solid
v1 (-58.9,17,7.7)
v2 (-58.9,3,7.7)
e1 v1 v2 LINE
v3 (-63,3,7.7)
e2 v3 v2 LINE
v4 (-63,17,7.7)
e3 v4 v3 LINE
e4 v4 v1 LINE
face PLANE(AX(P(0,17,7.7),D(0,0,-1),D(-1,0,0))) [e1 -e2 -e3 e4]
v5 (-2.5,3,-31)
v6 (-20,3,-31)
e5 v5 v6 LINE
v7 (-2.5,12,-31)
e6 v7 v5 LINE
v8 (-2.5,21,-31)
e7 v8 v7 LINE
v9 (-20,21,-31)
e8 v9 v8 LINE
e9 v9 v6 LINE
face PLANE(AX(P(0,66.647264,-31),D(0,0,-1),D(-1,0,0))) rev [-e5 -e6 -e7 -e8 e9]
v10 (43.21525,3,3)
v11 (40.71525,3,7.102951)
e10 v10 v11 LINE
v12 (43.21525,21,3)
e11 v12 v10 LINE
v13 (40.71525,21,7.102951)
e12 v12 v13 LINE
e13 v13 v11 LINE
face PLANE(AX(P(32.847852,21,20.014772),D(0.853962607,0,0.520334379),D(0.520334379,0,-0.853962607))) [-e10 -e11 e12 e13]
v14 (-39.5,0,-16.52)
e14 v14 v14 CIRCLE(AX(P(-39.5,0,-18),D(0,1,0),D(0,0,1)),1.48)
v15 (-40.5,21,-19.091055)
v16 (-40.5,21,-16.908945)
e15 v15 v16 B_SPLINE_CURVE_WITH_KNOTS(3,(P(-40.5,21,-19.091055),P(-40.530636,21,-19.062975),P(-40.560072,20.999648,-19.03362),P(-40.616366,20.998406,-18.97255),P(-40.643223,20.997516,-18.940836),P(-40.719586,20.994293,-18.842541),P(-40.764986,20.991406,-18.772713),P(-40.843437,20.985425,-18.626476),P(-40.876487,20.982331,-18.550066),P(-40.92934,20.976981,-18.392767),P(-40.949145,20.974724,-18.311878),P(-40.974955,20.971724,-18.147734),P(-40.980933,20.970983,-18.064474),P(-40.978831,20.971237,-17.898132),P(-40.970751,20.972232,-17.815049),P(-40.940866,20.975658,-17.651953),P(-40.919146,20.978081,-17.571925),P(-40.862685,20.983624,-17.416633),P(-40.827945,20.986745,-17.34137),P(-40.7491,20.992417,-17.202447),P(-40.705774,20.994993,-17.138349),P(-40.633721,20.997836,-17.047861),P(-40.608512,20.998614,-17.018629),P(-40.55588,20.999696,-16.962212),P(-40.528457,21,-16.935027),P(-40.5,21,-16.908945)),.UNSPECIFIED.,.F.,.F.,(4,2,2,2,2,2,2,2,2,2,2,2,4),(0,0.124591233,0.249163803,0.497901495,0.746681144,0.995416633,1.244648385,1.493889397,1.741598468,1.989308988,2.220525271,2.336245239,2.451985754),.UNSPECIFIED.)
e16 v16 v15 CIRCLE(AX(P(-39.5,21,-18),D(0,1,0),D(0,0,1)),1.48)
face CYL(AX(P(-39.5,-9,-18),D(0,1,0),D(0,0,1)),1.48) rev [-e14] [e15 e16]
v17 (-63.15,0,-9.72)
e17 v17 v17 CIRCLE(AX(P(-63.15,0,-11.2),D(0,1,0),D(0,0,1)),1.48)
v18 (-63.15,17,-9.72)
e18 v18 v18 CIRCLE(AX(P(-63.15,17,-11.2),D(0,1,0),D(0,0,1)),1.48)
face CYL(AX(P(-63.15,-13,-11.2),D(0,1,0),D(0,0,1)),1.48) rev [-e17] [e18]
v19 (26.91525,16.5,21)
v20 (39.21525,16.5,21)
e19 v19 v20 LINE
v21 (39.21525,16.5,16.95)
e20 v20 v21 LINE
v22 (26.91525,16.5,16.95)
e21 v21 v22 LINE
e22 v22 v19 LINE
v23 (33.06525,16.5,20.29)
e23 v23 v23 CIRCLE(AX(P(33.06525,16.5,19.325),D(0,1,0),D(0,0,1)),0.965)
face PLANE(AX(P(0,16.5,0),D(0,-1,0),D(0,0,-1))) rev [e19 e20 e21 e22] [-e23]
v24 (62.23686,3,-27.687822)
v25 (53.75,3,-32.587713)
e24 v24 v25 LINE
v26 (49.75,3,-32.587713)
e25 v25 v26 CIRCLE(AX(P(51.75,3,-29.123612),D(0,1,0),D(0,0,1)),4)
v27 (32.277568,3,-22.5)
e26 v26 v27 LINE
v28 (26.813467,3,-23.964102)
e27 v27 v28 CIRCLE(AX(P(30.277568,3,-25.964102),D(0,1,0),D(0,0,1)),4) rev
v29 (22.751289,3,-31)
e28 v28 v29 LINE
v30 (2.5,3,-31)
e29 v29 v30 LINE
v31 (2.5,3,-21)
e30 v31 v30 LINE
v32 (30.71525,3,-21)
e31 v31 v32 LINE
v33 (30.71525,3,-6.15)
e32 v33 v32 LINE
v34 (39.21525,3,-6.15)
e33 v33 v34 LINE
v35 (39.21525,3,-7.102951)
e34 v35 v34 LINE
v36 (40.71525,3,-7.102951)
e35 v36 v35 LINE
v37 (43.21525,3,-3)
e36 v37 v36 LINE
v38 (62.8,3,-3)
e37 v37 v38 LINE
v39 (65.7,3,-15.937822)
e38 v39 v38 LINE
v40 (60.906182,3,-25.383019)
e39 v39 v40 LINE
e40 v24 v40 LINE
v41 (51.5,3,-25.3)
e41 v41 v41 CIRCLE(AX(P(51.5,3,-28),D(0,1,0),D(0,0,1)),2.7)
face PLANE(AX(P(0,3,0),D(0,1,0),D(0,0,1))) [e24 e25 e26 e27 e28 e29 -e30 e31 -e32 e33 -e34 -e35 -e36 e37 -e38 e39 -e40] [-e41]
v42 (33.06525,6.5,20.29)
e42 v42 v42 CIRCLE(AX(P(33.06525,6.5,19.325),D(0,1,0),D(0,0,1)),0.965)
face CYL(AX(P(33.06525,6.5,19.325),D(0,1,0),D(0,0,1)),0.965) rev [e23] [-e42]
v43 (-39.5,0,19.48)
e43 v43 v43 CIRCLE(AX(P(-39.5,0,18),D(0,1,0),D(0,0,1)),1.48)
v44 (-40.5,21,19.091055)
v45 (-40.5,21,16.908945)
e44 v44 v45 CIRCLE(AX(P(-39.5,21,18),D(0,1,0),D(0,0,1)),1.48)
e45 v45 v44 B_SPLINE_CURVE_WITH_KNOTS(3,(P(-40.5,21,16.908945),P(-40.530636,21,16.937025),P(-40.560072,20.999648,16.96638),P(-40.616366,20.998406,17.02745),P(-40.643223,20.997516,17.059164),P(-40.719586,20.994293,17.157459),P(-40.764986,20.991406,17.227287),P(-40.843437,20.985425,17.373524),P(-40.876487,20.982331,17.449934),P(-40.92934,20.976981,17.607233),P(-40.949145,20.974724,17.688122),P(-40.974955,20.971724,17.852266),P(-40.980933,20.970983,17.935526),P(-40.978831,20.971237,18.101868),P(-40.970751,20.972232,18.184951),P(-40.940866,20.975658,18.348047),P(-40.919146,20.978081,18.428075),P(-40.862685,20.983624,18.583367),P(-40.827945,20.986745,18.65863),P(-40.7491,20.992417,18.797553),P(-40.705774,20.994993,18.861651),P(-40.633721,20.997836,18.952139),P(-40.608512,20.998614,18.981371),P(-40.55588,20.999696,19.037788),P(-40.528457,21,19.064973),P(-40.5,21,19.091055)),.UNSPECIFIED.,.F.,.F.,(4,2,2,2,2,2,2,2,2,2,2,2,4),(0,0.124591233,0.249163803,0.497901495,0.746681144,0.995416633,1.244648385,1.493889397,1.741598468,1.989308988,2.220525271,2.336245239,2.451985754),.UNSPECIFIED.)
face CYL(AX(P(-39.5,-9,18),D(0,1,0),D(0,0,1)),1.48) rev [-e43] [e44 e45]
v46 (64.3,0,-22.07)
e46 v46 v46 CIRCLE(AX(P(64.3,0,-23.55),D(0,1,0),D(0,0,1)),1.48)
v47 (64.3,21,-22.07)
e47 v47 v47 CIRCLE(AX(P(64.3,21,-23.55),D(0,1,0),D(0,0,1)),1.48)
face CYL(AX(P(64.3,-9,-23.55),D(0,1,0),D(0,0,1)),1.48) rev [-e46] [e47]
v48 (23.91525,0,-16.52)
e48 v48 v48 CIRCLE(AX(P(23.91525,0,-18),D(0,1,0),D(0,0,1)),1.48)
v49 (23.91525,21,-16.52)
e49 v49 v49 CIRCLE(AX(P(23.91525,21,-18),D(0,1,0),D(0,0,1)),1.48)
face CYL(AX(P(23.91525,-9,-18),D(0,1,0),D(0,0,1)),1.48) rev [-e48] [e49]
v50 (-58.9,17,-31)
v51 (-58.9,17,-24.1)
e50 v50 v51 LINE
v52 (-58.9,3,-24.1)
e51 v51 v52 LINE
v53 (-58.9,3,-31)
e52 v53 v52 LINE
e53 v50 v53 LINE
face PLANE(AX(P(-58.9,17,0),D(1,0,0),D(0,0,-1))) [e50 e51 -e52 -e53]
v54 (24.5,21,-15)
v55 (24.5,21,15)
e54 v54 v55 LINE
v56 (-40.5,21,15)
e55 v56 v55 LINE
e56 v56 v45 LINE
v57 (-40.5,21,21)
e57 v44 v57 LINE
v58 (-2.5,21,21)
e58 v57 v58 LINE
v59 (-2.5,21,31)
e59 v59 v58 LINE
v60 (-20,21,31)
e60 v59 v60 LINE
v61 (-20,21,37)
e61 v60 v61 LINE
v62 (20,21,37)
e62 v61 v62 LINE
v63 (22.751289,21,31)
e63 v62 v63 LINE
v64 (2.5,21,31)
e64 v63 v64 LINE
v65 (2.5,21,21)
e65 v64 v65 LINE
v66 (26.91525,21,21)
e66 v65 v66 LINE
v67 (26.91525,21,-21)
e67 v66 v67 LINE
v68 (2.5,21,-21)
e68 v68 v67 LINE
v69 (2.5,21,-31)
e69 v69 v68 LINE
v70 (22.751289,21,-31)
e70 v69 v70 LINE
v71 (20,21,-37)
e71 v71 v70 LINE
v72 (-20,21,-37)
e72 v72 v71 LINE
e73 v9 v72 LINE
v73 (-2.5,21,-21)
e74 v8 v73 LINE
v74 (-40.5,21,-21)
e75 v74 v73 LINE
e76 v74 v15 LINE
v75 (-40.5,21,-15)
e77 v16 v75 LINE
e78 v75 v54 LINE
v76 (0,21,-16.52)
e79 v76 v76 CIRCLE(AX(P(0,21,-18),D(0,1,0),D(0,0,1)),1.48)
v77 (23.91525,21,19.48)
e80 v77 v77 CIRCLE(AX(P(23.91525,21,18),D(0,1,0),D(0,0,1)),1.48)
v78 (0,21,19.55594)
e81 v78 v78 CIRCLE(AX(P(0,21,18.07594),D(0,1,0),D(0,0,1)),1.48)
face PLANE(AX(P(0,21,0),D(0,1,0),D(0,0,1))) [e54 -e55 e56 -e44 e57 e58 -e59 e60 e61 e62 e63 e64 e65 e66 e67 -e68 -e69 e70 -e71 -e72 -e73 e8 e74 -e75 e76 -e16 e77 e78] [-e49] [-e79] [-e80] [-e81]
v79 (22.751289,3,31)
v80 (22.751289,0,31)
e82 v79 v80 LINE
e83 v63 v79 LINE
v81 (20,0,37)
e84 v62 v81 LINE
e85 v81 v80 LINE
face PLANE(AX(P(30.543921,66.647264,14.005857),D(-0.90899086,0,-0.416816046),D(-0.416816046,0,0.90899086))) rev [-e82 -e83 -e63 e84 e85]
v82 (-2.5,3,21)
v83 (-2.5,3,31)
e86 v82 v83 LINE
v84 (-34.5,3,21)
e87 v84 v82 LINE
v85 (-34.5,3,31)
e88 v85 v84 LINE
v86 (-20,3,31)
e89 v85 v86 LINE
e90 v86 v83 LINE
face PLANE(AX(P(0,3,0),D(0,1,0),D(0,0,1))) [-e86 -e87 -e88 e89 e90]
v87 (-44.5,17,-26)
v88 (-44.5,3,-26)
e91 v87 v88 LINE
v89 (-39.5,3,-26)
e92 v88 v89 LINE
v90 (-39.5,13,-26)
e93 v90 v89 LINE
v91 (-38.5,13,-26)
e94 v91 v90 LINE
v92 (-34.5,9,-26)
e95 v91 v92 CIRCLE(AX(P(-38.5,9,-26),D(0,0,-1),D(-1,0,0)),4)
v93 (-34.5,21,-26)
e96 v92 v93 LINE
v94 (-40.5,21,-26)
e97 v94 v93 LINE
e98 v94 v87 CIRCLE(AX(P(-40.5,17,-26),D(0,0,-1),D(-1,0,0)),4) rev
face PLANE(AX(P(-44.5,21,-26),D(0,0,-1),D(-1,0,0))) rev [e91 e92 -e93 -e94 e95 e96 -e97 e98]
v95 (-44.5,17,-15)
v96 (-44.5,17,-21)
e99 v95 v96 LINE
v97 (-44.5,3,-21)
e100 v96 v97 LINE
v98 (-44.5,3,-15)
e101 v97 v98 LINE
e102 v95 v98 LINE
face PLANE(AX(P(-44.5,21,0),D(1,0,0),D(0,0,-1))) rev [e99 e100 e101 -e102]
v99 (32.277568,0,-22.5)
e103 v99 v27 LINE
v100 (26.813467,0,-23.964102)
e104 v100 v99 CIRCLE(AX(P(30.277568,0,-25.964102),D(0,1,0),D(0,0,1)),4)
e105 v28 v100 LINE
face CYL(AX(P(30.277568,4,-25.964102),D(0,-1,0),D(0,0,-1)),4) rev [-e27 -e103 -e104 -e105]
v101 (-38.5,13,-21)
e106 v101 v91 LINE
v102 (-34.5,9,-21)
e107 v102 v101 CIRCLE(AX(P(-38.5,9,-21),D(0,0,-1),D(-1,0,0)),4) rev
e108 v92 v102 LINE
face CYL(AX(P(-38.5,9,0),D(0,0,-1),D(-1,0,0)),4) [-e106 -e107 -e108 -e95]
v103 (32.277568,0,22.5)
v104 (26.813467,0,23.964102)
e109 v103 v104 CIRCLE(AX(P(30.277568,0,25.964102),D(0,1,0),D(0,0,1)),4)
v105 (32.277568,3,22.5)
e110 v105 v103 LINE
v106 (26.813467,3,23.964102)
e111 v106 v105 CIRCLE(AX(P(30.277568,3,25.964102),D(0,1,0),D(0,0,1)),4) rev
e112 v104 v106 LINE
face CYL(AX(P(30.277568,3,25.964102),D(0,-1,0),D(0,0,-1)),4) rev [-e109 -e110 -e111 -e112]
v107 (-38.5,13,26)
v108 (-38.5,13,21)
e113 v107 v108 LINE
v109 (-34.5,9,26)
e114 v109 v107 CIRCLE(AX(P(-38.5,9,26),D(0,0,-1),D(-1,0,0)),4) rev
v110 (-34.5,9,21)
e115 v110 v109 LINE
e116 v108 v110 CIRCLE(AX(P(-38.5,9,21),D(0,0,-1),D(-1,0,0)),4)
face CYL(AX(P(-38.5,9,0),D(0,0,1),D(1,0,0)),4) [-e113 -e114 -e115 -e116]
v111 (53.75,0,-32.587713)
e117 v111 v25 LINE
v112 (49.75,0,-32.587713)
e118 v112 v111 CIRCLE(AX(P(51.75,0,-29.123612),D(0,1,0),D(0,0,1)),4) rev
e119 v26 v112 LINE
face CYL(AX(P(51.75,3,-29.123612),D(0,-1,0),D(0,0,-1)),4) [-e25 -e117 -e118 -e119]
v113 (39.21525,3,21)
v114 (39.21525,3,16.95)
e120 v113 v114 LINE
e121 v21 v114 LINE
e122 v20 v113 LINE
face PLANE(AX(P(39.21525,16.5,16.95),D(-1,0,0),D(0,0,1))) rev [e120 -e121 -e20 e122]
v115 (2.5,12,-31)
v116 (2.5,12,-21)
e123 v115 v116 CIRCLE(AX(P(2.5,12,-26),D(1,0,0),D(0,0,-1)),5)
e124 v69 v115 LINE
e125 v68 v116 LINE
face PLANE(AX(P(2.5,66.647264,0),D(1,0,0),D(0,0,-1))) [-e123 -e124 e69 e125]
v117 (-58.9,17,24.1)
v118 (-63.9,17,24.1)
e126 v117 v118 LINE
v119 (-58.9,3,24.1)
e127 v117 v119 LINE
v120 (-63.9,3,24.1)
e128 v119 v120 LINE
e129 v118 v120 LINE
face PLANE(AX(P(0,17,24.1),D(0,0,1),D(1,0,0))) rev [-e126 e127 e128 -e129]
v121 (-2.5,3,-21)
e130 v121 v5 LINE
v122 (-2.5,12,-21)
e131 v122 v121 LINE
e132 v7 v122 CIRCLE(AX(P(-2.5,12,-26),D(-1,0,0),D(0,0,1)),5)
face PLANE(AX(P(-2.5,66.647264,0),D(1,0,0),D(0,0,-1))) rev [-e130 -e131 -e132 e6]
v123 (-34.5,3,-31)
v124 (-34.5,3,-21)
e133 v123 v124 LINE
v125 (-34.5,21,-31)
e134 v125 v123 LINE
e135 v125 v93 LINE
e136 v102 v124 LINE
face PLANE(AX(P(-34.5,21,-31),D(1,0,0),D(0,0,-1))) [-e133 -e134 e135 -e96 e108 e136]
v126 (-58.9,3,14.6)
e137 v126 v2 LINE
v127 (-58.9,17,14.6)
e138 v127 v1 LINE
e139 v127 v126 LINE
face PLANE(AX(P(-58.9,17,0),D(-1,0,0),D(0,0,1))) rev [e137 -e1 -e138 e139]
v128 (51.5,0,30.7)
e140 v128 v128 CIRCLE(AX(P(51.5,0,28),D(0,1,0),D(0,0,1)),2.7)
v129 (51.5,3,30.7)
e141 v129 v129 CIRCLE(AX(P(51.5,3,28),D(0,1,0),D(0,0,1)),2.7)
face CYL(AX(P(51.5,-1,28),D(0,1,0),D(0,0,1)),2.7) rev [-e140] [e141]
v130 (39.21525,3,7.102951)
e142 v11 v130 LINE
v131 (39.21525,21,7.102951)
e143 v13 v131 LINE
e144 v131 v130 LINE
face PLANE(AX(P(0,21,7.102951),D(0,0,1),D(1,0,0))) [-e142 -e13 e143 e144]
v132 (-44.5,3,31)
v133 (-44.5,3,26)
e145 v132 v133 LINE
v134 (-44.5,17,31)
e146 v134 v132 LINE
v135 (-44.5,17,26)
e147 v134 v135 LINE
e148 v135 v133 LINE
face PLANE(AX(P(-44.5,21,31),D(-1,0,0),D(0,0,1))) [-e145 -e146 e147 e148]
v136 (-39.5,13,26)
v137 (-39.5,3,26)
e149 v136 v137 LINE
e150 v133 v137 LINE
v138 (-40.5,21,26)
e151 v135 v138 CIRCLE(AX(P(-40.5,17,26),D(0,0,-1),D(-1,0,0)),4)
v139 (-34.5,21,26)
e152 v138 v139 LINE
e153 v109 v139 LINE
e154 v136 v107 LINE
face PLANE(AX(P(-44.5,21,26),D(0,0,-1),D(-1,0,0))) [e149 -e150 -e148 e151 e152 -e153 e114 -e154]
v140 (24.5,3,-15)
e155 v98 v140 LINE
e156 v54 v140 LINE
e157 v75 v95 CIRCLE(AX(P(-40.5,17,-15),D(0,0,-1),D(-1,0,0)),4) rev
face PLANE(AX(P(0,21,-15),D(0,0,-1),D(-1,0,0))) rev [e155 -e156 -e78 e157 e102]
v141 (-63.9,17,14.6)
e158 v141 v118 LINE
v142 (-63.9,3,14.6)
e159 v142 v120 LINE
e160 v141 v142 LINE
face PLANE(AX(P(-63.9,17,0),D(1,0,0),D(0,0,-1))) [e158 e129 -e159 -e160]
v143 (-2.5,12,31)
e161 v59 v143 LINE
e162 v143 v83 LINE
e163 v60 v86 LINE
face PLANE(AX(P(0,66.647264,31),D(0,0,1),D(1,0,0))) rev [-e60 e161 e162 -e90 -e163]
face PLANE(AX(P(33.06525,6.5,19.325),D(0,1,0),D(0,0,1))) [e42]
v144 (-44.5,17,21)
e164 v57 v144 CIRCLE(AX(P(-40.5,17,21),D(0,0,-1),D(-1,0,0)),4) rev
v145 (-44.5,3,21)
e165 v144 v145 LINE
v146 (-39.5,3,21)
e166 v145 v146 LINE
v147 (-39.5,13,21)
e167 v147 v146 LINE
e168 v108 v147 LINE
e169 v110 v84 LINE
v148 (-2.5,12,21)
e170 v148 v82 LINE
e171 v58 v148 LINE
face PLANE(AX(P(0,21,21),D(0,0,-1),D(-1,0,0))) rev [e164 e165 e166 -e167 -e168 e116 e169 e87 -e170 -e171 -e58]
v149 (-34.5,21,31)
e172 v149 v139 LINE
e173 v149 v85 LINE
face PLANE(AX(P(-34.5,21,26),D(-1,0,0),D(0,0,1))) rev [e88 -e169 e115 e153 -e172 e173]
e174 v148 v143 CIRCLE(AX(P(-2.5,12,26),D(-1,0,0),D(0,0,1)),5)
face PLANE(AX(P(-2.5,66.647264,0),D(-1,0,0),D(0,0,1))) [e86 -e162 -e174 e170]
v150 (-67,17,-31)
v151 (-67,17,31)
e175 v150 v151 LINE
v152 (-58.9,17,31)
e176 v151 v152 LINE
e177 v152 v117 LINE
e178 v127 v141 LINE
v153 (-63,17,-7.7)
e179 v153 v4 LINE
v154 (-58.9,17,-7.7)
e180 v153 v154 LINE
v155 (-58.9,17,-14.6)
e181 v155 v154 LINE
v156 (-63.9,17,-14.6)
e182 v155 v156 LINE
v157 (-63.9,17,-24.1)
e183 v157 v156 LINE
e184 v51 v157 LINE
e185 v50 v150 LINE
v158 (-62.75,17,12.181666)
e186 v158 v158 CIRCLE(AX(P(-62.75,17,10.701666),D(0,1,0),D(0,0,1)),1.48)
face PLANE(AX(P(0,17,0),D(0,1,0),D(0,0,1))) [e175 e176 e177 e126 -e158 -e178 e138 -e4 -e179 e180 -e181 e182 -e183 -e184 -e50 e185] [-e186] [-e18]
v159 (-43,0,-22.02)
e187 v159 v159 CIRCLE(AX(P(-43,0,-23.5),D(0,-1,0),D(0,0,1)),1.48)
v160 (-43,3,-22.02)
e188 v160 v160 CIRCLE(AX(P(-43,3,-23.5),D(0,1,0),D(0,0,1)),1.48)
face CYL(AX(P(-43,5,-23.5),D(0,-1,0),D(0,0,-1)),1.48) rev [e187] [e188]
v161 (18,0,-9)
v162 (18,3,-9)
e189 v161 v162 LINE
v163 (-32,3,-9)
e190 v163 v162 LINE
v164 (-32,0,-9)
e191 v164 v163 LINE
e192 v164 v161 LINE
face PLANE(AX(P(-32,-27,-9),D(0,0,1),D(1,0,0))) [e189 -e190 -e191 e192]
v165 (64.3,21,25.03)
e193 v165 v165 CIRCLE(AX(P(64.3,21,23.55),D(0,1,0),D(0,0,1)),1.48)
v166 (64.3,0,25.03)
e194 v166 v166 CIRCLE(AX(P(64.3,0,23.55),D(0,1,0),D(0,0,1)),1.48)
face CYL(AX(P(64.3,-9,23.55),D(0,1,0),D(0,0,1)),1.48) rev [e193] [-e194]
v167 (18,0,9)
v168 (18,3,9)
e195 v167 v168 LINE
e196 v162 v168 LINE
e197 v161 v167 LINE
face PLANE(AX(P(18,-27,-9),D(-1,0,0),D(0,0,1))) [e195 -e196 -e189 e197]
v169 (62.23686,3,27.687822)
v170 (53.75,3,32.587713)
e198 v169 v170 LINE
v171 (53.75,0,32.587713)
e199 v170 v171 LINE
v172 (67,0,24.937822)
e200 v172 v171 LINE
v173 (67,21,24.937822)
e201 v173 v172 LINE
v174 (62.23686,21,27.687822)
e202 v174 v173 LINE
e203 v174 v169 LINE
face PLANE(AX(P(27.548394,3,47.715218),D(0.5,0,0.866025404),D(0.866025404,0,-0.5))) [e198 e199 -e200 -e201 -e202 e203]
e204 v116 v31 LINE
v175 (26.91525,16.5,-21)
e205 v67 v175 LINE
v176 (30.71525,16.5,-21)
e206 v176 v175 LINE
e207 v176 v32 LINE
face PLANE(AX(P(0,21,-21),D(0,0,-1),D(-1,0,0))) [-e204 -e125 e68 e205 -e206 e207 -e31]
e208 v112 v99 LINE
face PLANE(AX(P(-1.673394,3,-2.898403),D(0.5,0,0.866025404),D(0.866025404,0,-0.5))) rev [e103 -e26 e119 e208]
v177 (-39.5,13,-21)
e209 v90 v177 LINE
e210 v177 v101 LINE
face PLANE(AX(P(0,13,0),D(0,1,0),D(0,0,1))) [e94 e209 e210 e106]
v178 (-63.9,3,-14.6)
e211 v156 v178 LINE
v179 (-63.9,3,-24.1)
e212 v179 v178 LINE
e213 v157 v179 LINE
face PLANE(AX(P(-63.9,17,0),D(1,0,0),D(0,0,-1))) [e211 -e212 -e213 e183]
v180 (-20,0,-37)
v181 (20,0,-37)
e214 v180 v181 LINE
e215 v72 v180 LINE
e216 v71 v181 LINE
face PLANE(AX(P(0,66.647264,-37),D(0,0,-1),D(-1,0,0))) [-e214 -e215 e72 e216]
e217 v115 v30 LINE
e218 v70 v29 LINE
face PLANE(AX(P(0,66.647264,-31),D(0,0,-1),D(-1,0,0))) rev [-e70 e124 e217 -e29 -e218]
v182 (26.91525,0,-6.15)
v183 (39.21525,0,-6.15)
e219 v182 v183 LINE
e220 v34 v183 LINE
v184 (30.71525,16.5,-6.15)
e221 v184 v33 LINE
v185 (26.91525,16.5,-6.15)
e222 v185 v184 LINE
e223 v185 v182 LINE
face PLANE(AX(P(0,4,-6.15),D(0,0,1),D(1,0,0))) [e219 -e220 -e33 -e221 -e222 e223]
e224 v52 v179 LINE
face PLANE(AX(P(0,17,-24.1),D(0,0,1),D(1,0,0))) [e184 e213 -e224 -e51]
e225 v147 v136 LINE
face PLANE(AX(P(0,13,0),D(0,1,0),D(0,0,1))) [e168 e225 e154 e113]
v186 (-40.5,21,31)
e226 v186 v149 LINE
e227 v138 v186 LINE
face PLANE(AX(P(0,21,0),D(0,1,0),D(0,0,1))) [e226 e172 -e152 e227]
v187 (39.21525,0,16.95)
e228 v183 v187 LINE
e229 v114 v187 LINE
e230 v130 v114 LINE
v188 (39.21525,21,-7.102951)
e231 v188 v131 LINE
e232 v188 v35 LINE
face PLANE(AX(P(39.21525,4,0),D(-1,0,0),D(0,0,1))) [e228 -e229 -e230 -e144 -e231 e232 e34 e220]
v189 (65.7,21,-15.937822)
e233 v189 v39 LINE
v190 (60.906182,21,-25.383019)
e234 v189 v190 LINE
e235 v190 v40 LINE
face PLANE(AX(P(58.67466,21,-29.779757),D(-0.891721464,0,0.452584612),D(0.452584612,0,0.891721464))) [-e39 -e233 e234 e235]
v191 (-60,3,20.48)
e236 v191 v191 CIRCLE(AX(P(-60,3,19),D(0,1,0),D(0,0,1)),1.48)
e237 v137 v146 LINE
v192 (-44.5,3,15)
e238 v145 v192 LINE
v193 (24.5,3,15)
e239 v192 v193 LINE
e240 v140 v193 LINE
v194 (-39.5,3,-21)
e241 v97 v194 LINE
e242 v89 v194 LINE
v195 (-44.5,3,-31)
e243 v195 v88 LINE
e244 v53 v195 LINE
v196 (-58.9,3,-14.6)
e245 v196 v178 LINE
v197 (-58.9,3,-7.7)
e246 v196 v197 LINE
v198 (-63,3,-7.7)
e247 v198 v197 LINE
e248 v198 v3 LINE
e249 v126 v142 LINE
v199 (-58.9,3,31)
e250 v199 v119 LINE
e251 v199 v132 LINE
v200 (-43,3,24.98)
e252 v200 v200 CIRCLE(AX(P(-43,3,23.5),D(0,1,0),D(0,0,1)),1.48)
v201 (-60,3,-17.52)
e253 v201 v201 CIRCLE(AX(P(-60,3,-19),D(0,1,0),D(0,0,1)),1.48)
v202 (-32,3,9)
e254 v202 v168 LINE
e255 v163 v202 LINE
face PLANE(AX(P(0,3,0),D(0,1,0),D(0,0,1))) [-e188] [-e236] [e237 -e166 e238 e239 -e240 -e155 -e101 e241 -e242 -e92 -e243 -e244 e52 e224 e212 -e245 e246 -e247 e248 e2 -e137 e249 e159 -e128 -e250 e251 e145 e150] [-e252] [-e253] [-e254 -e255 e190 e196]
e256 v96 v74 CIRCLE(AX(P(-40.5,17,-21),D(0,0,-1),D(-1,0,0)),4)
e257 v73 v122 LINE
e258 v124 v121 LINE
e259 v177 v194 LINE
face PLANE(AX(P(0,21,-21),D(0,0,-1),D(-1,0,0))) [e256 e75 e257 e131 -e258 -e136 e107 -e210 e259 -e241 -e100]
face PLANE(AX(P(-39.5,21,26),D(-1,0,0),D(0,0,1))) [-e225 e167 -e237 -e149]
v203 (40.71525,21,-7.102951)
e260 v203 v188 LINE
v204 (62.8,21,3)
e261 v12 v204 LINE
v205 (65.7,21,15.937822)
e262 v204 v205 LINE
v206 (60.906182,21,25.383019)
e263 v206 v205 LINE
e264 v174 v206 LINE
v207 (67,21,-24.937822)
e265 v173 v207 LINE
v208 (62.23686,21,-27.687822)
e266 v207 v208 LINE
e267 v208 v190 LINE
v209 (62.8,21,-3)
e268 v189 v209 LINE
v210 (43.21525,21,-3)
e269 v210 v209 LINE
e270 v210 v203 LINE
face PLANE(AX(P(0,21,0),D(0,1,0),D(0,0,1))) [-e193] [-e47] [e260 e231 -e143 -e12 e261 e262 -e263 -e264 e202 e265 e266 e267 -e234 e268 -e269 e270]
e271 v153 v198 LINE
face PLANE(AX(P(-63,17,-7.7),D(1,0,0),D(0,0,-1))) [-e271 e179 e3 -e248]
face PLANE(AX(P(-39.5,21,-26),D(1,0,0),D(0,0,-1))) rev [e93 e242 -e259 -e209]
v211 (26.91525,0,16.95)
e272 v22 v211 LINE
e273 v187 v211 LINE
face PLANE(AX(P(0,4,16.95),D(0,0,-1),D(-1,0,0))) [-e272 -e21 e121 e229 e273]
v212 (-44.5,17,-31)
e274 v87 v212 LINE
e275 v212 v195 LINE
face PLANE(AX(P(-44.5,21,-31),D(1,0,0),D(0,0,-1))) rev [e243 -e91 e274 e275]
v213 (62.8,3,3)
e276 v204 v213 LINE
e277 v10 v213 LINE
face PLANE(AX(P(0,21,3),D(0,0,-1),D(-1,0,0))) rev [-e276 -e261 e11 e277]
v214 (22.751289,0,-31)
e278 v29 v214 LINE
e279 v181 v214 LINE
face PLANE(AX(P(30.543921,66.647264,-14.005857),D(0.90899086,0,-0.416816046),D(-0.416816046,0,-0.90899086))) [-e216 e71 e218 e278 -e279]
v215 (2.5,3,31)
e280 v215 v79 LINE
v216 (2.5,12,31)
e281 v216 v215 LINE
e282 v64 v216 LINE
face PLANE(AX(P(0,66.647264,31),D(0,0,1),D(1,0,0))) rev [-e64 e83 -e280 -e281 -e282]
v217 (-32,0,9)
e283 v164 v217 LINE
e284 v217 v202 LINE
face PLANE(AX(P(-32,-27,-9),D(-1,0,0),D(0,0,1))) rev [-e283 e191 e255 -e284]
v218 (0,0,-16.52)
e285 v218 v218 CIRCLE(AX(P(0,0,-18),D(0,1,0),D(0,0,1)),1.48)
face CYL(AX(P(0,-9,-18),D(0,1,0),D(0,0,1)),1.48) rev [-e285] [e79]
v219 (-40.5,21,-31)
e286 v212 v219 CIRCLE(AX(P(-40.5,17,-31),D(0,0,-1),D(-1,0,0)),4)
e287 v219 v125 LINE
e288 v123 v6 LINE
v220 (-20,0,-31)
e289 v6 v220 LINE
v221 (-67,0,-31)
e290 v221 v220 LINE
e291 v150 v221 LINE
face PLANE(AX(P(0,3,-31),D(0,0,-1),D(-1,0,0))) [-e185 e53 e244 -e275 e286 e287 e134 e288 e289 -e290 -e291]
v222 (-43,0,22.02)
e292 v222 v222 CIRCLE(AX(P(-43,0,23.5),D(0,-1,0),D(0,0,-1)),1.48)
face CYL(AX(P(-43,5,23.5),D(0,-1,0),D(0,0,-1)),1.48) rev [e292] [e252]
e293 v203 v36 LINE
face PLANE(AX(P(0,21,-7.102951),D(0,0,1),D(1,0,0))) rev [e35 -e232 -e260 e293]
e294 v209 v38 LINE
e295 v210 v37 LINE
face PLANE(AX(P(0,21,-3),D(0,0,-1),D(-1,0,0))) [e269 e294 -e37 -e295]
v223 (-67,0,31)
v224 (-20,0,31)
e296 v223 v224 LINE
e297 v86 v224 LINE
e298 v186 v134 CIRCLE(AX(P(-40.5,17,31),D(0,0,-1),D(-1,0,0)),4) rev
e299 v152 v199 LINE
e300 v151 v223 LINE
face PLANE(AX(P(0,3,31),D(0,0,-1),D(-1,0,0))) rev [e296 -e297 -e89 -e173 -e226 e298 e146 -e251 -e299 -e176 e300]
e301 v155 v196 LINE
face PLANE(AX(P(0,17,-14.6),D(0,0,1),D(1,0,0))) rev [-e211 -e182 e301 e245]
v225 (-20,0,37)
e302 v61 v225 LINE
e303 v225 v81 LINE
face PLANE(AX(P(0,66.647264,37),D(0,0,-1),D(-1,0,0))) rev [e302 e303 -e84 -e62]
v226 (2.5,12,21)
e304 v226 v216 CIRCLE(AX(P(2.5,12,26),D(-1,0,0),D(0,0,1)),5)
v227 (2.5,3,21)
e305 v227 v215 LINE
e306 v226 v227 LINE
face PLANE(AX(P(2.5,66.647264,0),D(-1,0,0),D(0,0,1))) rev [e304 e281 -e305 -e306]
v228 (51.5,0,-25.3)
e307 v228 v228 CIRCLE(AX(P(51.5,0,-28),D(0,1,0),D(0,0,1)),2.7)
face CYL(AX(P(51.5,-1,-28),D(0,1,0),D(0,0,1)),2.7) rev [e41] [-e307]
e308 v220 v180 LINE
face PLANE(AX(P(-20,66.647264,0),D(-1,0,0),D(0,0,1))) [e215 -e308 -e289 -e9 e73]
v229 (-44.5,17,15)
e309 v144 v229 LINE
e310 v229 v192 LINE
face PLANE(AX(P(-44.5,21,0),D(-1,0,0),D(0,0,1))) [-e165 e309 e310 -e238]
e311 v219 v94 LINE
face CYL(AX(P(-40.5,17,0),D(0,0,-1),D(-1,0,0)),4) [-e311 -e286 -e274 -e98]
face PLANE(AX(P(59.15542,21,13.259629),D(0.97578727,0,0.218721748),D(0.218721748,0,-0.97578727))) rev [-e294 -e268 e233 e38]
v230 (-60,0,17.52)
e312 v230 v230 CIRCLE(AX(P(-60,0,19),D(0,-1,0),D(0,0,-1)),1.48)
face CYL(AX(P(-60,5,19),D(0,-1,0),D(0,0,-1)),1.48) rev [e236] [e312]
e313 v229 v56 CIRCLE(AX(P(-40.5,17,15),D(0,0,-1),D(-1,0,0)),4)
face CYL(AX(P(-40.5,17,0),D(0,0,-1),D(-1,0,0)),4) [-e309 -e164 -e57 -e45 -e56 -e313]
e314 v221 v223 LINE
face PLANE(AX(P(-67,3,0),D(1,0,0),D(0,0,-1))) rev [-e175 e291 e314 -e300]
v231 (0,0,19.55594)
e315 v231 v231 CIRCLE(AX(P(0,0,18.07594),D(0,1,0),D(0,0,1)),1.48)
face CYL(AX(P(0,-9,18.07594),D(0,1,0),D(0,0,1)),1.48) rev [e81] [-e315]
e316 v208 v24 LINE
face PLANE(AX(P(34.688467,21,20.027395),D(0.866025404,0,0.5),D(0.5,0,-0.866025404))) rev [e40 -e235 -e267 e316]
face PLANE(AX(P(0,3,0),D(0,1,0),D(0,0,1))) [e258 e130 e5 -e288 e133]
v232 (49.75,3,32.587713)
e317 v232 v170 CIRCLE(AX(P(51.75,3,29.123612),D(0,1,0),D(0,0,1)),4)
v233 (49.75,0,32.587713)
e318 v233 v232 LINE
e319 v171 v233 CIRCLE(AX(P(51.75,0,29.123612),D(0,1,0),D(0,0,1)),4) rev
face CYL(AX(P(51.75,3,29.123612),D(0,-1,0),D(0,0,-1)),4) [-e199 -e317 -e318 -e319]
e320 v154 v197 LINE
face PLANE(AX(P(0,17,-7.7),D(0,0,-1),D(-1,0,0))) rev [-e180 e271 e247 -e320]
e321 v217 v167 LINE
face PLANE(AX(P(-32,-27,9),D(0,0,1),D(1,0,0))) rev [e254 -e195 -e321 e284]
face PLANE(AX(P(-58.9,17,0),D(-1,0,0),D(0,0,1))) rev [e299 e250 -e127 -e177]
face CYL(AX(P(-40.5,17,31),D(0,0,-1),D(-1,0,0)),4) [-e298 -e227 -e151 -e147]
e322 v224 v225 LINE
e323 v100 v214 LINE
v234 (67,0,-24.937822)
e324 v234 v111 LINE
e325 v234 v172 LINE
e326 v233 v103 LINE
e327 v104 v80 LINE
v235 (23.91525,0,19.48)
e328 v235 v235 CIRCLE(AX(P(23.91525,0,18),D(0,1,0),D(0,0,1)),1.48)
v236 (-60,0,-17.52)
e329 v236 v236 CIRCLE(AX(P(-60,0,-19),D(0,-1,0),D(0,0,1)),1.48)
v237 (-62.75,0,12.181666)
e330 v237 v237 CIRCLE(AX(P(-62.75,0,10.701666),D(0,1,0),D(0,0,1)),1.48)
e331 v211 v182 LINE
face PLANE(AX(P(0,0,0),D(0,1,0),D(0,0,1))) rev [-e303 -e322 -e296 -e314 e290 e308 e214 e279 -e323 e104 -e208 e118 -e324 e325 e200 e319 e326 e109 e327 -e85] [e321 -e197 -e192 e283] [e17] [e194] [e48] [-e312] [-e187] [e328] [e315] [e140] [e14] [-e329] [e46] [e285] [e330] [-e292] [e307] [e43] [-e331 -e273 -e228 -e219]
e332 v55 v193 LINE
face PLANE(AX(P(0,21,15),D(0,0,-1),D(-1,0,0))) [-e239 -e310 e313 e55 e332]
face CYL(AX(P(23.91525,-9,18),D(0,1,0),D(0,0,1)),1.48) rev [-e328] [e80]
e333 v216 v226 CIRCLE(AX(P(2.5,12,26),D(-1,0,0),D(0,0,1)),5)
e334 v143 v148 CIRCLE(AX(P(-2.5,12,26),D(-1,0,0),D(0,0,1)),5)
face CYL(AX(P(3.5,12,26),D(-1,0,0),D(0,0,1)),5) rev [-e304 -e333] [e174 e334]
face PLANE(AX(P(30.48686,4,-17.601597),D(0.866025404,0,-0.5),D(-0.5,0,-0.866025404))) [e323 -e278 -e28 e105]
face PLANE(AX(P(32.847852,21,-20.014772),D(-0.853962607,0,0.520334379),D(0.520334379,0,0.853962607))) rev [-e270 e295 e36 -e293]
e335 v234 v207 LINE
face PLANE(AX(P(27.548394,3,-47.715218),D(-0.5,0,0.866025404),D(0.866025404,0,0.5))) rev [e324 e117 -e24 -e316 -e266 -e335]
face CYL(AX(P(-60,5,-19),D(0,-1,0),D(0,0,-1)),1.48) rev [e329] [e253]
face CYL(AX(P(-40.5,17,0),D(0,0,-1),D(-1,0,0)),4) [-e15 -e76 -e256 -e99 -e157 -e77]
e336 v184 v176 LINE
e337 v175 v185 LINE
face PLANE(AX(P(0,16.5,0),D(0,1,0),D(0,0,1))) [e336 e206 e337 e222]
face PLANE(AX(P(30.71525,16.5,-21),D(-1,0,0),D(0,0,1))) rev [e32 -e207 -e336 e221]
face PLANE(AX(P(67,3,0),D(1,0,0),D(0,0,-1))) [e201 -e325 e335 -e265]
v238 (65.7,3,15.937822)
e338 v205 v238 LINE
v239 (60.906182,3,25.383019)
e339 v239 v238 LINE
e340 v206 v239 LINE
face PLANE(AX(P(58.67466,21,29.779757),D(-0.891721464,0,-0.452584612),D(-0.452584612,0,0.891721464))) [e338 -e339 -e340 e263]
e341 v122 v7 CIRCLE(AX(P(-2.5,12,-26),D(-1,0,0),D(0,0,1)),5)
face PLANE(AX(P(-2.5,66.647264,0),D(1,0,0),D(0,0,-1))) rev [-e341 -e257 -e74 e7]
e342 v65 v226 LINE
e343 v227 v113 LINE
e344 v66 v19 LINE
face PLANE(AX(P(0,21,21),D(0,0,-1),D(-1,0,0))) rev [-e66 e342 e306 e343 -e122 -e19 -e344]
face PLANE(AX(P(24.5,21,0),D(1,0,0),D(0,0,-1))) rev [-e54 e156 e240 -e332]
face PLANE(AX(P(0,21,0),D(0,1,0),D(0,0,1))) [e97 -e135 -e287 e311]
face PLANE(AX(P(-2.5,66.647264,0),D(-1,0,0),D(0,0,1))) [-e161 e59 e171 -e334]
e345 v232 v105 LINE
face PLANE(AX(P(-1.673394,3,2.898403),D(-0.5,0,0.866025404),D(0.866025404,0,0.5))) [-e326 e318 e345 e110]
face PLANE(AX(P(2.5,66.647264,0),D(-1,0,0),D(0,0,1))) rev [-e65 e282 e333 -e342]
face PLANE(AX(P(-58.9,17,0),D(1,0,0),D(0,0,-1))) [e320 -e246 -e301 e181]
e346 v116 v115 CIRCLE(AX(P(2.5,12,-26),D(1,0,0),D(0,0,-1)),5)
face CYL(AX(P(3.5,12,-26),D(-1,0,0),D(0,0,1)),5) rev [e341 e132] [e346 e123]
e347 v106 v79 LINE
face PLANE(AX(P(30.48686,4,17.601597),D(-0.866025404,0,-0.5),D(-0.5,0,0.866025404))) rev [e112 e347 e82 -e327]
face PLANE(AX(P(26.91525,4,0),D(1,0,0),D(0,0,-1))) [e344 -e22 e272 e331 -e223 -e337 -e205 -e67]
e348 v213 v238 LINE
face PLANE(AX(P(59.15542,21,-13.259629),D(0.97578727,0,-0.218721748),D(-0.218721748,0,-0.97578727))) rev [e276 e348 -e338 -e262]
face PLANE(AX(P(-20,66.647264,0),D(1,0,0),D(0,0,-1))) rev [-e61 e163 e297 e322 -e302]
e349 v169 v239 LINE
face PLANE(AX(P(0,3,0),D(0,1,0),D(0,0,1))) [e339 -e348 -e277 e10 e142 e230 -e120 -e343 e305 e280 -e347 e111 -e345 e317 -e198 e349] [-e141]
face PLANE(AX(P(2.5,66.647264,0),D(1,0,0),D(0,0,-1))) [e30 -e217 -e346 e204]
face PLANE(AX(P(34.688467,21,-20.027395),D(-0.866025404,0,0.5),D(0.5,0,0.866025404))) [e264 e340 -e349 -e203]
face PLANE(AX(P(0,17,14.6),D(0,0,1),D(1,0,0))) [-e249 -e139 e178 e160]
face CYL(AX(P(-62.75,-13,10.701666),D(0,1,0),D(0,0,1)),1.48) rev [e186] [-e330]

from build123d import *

# Parameters (mm, degrees)
SKETCH_1_W               = 134
SKETCH_1_H               = 62
EXTRUDE_1_DEPTH          = 3
SKETCH_2_R               = 2.7
CUT_EXTRUDE_1_DEPTH      = 4
EXTRUDE_3_DEPTH          = 3
CUT_EXTRUDE_4_DEPTH      = 4
CUT_EXTRUDE_4_DEPTH_BACK = 3
SKETCH_1_6_W             = 12.3
SKETCH_1_6_H             = 23.1
SKETCH_3_W               = 4
SKETCH_3_H               = 15.4
EXTRUDE_4_DEPTH          = 14
SKETCH_4_W               = 5
SKETCH_4_H               = 5
EXTRUDE_5_DEPTH          = 18
FILLET_1_R               = 4
EXTRUDE_6_DEPTH          = 18
SKETCH_6_W               = 12.3
SKETCH_6_H               = 4.05
SKETCH_6_W_2             = 3.8
SKETCH_6_H_2             = 14.85
EXTRUDE_7_DEPTH          = 13.5
SKETCH_7_R               = 1.48
CUT_EXTRUDE_5_DEPTH      = 5
EXTRUDE_9_DEPTH          = 18
EXTRUDE_10_DEPTH         = 18
EXTRUDE_START            = -21
SKETCH_11_W              = 5
SKETCH_11_H              = 10
EXTRUDE_11_DEPTH         = 21
SKETCH_12_R              = 5
CUT_EXTRUDE_6_DEPTH      = 6
SKETCH_13_R              = 5
CUT_EXTRUDE_7_DEPTH      = 6
SKETCH_14_R              = 0.965
CUT_EXTRUDE_8_DEPTH      = 10
SKETCH_17_R              = 1.48
CUT_EXTRUDE_10_DEPTH     = 30
SKETCH_18_R              = 1.48
CUT_EXTRUDE_11_DEPTH     = 30
SKETCH_19_R              = 1.48
CUT_EXTRUDE_12_DEPTH     = 30
SKETCH_20_W              = 5
SKETCH_20_H              = 5
CUT_EXTRUDE_13_DEPTH     = 8
SKETCH_21_R              = 1.48
CUT_EXTRUDE_14_DEPTH     = 30
SKETCH_22_R              = 1.48
CUT_EXTRUDE_15_DEPTH     = 30
SKETCH_23_R              = 1.48
CUT_EXTRUDE_16_DEPTH     = 30
SKETCH_24_W              = 50
SKETCH_24_H              = 18
CUT_EXTRUDE_17_DEPTH     = 30
FILLET_2_R               = 4
FILLET_3_R               = 4


with BuildPart() as part:
    # 草图1 → 凸台-拉伸1 (new body)
    with BuildSketch(Plane(origin=(0, 0, 0), x_dir=(1, 0, 0), z_dir=(0, 1, 0))):
        Rectangle(SKETCH_1_W, SKETCH_1_H)
    extrude(amount=EXTRUDE_1_DEPTH)

    # 草图2 → 切除-拉伸1 (cut)
    with BuildSketch(Plane(origin=(0, 3, 0), x_dir=(1, 0, 0), z_dir=(0, 1, 0))):
        with Locations(Location((51.5, 28, 0), (0, 0, 270))):
            Circle(SKETCH_2_R)
        with Locations(Location((51.5, -28, 0), (0, 0, 270))):
            Circle(SKETCH_2_R)
    extrude(amount=-CUT_EXTRUDE_1_DEPTH, mode=Mode.SUBTRACT)

    # 草图1<4> → 凸台-拉伸3 (add)
    with BuildSketch(Plane(origin=(0, 0, 0), x_dir=(1, 0, 0), z_dir=(0, 1, 0))):
        Polygon((51.75, 33.742413779), (47, 31), (56.5, 31), align=None)
        Polygon((56.5, -31), (47, -31), (51.75, -33.742413779), align=None)
    extrude(amount=EXTRUDE_3_DEPTH)

    # 草图1<6> → 切除-拉伸4 (cut, two sides: drawn at the far end of the back side and taken through both)
    with BuildSketch(Plane(origin=(0, 0, 0), x_dir=(1, 0, 0), z_dir=(0, 1, 0)).offset(-CUT_EXTRUDE_4_DEPTH_BACK)):
        with Locations((33.065250205, -5.4)):
            Rectangle(SKETCH_1_6_W, SKETCH_1_6_H)
        Polygon((47, 31), (22.751288694, 31), (28.813466521, 20.5), align=None)
        Polygon((67, 31), (56.5, 31), (67, 24.937822174), align=None)
        Polygon((28.813466521, -20.5), (22.751288694, -31), (47, -31), align=None)
        Polygon((67, -24.937822174), (56.5, -31), (67, -31), align=None)
    extrude(amount=CUT_EXTRUDE_4_DEPTH + CUT_EXTRUDE_4_DEPTH_BACK, mode=Mode.SUBTRACT)

    # 草图3 → 凸台-拉伸4 (add)
    with BuildSketch(Plane(origin=(0, 3, 0), x_dir=(1, 0, 0), z_dir=(0, 1, 0))):
        Polygon((-58.9, 31), (-67, 31), (-67, 7.7), (-63, 7.7), (-58.9, 7.7), (-58.9, 14.6), (-63.9, 14.6), (-63.9, 24.1), (-58.9, 24.1), align=None)
        Polygon((-63, -7.7), (-67, -7.7), (-67, -31), (-58.9, -31), (-58.9, -24.1), (-63.9, -24.1), (-63.9, -14.6), (-58.9, -14.6), (-58.9, -7.7), align=None)
        with Locations((-65, 0)):
            Rectangle(SKETCH_3_W, SKETCH_3_H)
    extrude(amount=EXTRUDE_4_DEPTH)

    # 草图4 → 凸台-拉伸5 (add)
    with BuildSketch(Plane(origin=(0, 3, 0), x_dir=(1, 0, 0), z_dir=(0, 1, 0))):
        Polygon((24.5, 15), (24.5, 0), (26.915250205, 0), (26.915250205, 21), (24.5, 21), align=None)
        Polygon((26.915250205, 0), (24.5, 0), (24.5, -15), (24.5, -21), (26.915250205, -21), align=None)
        Polygon((-44.5, 15), (24.5, 15), (24.5, 21), (-34.5, 21), (-39.5, 21), (-44.5, 21), align=None)
        Polygon((24.5, -21), (24.5, -15), (-44.5, -15), (-44.5, -21), (-39.5, -21), (-34.5, -21), align=None)
        with Locations((-37, 23.5)):
            Rectangle(SKETCH_4_W, SKETCH_4_H)
        with Locations((-37, -23.5)):
            Rectangle(SKETCH_4_W, SKETCH_4_H)
        Polygon((-39.5, 26), (-34.5, 26), (-34.5, 31), (-44.5, 31), (-44.5, 26), align=None)
        Polygon((-34.5, -31), (-34.5, -26), (-39.5, -26), (-44.5, -26), (-44.5, -31), align=None)
    extrude(amount=EXTRUDE_5_DEPTH)

    # 圆角1
    fillet_1_edges = [part.edges().sort_by_distance(p)[0] for p in [
        (51.75, 1.5, 33.742413779),
        (28.813466521, 1.5, 20.5),
        (28.813466521, 1.5, -20.5),
        (51.75, 1.5, -33.742413779),
    ]]
    fillet(fillet_1_edges, radius=FILLET_1_R)

    # 草图5 → 凸台-拉伸6 (add)
    with BuildSketch(Plane(origin=(0, 3, 0), x_dir=(1, 0, 0), z_dir=(0, 1, 0))):
        Polygon((43.215250205, 3), (39.215250205, 3), (39.215250205, -3), (43.215250205, -3), (67, -3), (67, 3), align=None)
        Polygon((39.215250205, 6.15), (39.215250205, 3), (43.215250205, 3), (40.715250205, 7.102951113), (39.215250205, 7.102951113), align=None)
        Polygon((43.215250205, -3), (39.215250205, -3), (39.215250205, -7.102951113), (40.715250205, -7.102951113), align=None)
    extrude(amount=EXTRUDE_6_DEPTH)

    # 草图6 → 凸台-拉伸7 (add)
    with BuildSketch(Plane(origin=(0, 3, 0), x_dir=(1, 0, 0), z_dir=(0, 1, 0))):
        with Locations((33.065250205, -18.975)):
            Rectangle(SKETCH_6_W, SKETCH_6_H)
        with Locations((28.815250205, 13.575)):
            Rectangle(SKETCH_6_W_2, SKETCH_6_H_2)
    extrude(amount=EXTRUDE_7_DEPTH)

    # 草图7 → 切除-拉伸5 (cut)
    with BuildSketch(Plane.XZ):
        with Locations(Location((-60, 19, 0), (0, 0, 270))):
            Circle(SKETCH_7_R)
        with Locations(Location((-43, 23.5, 0), (0, 0, 270))):
            Circle(SKETCH_7_R)
        with Locations(Location((-43, -23.5, 0), (0, 0, 90))):
            Circle(SKETCH_7_R)
        with Locations(Location((-60, -19, 0), (0, 0, 90))):
            Circle(SKETCH_7_R)
    extrude(amount=-CUT_EXTRUDE_5_DEPTH, mode=Mode.SUBTRACT)

    # 草图9 → 凸台-拉伸9 (add)
    with BuildSketch(Plane(origin=(0, 3, 0), x_dir=(1, 0, 0), z_dir=(0, 1, 0))):
        Polygon((67, 3), (67, 24.937822174), (62.236860279, 27.687822174), (60.906181585, 25.383019067), (65.7, 15.937822174), (62.8, 3), align=None)
    extrude(amount=EXTRUDE_9_DEPTH)

    # 草图10 → 凸台-拉伸10 (add)
    with BuildSketch(Plane(origin=(0, 3, 0), x_dir=(1, 0, 0), z_dir=(0, 1, 0))):
        Polygon((67, -3), (62.8, -3), (65.7, -15.937822174), (60.906181585, -25.383019067), (62.236860279, -27.687822174), (67, -24.937822174), align=None)
    extrude(amount=EXTRUDE_10_DEPTH)

    # 草图11 → 凸台-拉伸11 (add)
    with BuildSketch(Plane.XZ.offset(EXTRUDE_START)):
        Polygon((-2.5, -31), (-20, -31), (-20, -37), (20, -37), (20, -31), (2.5, -31), align=None)
        with Locations((0, -26)):
            Rectangle(SKETCH_11_W, SKETCH_11_H)
        Polygon((20, -31), (20, -37), (22.751288694, -31), align=None)
        Polygon((2.5, 31), (20, 31), (20, 37), (-20, 37), (-20, 31), (-2.5, 31), align=None)
        with Locations((0, 26)):
            Rectangle(SKETCH_11_W, SKETCH_11_H)
        Polygon((20, 31), (22.751288694, 31), (20, 37), align=None)
    extrude(amount=EXTRUDE_11_DEPTH)

    # 草图12 → 切除-拉伸6 (cut)
    with BuildSketch(Plane.ZY.offset(2.5)):
        with Locations((26, 12)):
            Circle(SKETCH_12_R)
    extrude(amount=-CUT_EXTRUDE_6_DEPTH, mode=Mode.SUBTRACT)

    # 草图13 → 切除-拉伸7 (cut)
    with BuildSketch(Plane.ZY.offset(2.5)):
        with Locations((-26, 12)):
            Circle(SKETCH_13_R)
    extrude(amount=-CUT_EXTRUDE_7_DEPTH, mode=Mode.SUBTRACT)

    # 草图14 → 切除-拉伸8 (cut)
    with BuildSketch(Plane(origin=(0, 16.5, 0), x_dir=(1, 0, 0), z_dir=(0, 1, 0))):
        with Locations(Location((33.065250205, -19.325, 0), (0, 0, 270))):
            Circle(SKETCH_14_R)
    extrude(amount=-CUT_EXTRUDE_8_DEPTH, mode=Mode.SUBTRACT)

    # 草图17 → 切除-拉伸10 (cut)
    with BuildSketch(Plane(origin=(0, 21, 0), x_dir=(1, 0, 0), z_dir=(0, 1, 0))):
        with Locations(Location((64.3, 23.55, 0), (0, 0, 270))):
            Circle(SKETCH_17_R)
        with Locations(Location((64.3, -23.55, 0), (0, 0, 270))):
            Circle(SKETCH_17_R)
    extrude(amount=-CUT_EXTRUDE_10_DEPTH, mode=Mode.SUBTRACT)

    # 草图18 → 切除-拉伸11 (cut)
    with BuildSketch(Plane(origin=(0, 21, 0), x_dir=(1, 0, 0), z_dir=(0, 1, 0))):
        with Locations(Location((23.915250205, 18, 0), (0, 0, 270))):
            Circle(SKETCH_18_R)
        with Locations(Location((23.915250205, -18, 0), (0, 0, 270))):
            Circle(SKETCH_18_R)
    extrude(amount=-CUT_EXTRUDE_11_DEPTH, mode=Mode.SUBTRACT)

    # 草图19 → 切除-拉伸12 (cut)
    with BuildSketch(Plane(origin=(0, 21, 0), x_dir=(1, 0, 0), z_dir=(0, 1, 0))):
        with Locations(Location((0, 18, 0), (0, 0, 270))):
            Circle(SKETCH_19_R)
        with Locations(Location((0, -18.075939793, 0), (0, 0, 270))):
            Circle(SKETCH_19_R)
    extrude(amount=-CUT_EXTRUDE_12_DEPTH, mode=Mode.SUBTRACT)

    # 草图20 → 切除-拉伸13 (cut)
    with BuildSketch(Plane(origin=(0, 21, 0), x_dir=(1, 0, 0), z_dir=(0, 1, 0))):
        with Locations((-37, 23.5)):
            Rectangle(SKETCH_20_W, SKETCH_20_H)
        with Locations((-37, -23.5)):
            Rectangle(SKETCH_20_W, SKETCH_20_H)
    extrude(amount=-CUT_EXTRUDE_13_DEPTH, mode=Mode.SUBTRACT)

    # 草图21 → 切除-拉伸14 (cut)
    with BuildSketch(Plane(origin=(0, 21, 0), x_dir=(1, 0, 0), z_dir=(0, 1, 0))):
        with Locations(Location((-39.5, 18, 0), (0, 0, 270))):
            Circle(SKETCH_21_R)
        with Locations(Location((-39.5, -18, 0), (0, 0, 270))):
            Circle(SKETCH_21_R)
    extrude(amount=-CUT_EXTRUDE_14_DEPTH, mode=Mode.SUBTRACT)

    # 草图22 → 切除-拉伸15 (cut)
    with BuildSketch(Plane(origin=(0, 17, 0), x_dir=(1, 0, 0), z_dir=(0, 1, 0))):
        with Locations(Location((-63.15, 11.2, 0), (0, 0, 270))):
            Circle(SKETCH_22_R)
    extrude(amount=-CUT_EXTRUDE_15_DEPTH, mode=Mode.SUBTRACT)

    # 草图23 → 切除-拉伸16 (cut)
    with BuildSketch(Plane(origin=(0, 17, 0), x_dir=(1, 0, 0), z_dir=(0, 1, 0))):
        with Locations(Location((-62.75, -10.701666204, 0), (0, 0, 270))):
            Circle(SKETCH_23_R)
    extrude(amount=-CUT_EXTRUDE_16_DEPTH, mode=Mode.SUBTRACT)

    # 草图24 → 切除-拉伸17 (cut)
    with BuildSketch(Plane(origin=(0, 3, 0), x_dir=(1, 0, 0), z_dir=(0, 1, 0))):
        with Locations((-7, 0)):
            Rectangle(SKETCH_24_W, SKETCH_24_H)
    extrude(amount=-CUT_EXTRUDE_17_DEPTH, mode=Mode.SUBTRACT)

    # 圆角2
    # the kernel refuses this fillet: 4 mm, written as the material it takes off along each edge
    with BuildSketch(Plane(origin=(-44.5, 21, 5), x_dir=(1, 0, 0), z_dir=(0, 0, 1)), Plane(origin=(-44.5, 21, -31), x_dir=(1, 0, 0), z_dir=(0, 0, 1))) as fillet_2_piece_1:
        with BuildLine():
            CenterArc((FILLET_2_R, -FILLET_2_R), FILLET_2_R, 90, 90)
            Line((0, -FILLET_2_R), (0, 0))
            Line((0, 0), (FILLET_2_R, 0))
        make_face()
    extrude(amount=26, mode=Mode.SUBTRACT)
    with BuildSketch(Plane(origin=(-44.5, 21, -41), x_dir=(1, 0, 0), z_dir=(0, 0, 1))) as fillet_2_piece_2:
        with BuildLine():
            CenterArc((FILLET_2_R, -FILLET_2_R), FILLET_2_R, 90, 90)
            Line((0, -FILLET_2_R), (0, 0))
            Line((0, 0), (FILLET_2_R, 0))
        make_face()
    extrude(amount=25, mode=Mode.SUBTRACT)
    with BuildSketch(Plane(origin=(-44.5, 21, 16), x_dir=(0, -1, 0), z_dir=(0, 0, 1))) as fillet_2_piece_3:
        with BuildLine():
            CenterArc((FILLET_2_R, FILLET_2_R), FILLET_2_R, 180, 90)
            Line((0, FILLET_2_R), (0, 0))
            Line((0, 0), (FILLET_2_R, 0))
        make_face()
    extrude(amount=25, mode=Mode.SUBTRACT)

    # 圆角3
    fillet_3_edges = [part.edges().sort_by_distance(p)[0] for p in [
        (-34.5, 13, -23.5),
        (-34.5, 13, 23.5),
    ]]
    fillet(fillet_3_edges, radius=FILLET_3_R)


solid = part.part
